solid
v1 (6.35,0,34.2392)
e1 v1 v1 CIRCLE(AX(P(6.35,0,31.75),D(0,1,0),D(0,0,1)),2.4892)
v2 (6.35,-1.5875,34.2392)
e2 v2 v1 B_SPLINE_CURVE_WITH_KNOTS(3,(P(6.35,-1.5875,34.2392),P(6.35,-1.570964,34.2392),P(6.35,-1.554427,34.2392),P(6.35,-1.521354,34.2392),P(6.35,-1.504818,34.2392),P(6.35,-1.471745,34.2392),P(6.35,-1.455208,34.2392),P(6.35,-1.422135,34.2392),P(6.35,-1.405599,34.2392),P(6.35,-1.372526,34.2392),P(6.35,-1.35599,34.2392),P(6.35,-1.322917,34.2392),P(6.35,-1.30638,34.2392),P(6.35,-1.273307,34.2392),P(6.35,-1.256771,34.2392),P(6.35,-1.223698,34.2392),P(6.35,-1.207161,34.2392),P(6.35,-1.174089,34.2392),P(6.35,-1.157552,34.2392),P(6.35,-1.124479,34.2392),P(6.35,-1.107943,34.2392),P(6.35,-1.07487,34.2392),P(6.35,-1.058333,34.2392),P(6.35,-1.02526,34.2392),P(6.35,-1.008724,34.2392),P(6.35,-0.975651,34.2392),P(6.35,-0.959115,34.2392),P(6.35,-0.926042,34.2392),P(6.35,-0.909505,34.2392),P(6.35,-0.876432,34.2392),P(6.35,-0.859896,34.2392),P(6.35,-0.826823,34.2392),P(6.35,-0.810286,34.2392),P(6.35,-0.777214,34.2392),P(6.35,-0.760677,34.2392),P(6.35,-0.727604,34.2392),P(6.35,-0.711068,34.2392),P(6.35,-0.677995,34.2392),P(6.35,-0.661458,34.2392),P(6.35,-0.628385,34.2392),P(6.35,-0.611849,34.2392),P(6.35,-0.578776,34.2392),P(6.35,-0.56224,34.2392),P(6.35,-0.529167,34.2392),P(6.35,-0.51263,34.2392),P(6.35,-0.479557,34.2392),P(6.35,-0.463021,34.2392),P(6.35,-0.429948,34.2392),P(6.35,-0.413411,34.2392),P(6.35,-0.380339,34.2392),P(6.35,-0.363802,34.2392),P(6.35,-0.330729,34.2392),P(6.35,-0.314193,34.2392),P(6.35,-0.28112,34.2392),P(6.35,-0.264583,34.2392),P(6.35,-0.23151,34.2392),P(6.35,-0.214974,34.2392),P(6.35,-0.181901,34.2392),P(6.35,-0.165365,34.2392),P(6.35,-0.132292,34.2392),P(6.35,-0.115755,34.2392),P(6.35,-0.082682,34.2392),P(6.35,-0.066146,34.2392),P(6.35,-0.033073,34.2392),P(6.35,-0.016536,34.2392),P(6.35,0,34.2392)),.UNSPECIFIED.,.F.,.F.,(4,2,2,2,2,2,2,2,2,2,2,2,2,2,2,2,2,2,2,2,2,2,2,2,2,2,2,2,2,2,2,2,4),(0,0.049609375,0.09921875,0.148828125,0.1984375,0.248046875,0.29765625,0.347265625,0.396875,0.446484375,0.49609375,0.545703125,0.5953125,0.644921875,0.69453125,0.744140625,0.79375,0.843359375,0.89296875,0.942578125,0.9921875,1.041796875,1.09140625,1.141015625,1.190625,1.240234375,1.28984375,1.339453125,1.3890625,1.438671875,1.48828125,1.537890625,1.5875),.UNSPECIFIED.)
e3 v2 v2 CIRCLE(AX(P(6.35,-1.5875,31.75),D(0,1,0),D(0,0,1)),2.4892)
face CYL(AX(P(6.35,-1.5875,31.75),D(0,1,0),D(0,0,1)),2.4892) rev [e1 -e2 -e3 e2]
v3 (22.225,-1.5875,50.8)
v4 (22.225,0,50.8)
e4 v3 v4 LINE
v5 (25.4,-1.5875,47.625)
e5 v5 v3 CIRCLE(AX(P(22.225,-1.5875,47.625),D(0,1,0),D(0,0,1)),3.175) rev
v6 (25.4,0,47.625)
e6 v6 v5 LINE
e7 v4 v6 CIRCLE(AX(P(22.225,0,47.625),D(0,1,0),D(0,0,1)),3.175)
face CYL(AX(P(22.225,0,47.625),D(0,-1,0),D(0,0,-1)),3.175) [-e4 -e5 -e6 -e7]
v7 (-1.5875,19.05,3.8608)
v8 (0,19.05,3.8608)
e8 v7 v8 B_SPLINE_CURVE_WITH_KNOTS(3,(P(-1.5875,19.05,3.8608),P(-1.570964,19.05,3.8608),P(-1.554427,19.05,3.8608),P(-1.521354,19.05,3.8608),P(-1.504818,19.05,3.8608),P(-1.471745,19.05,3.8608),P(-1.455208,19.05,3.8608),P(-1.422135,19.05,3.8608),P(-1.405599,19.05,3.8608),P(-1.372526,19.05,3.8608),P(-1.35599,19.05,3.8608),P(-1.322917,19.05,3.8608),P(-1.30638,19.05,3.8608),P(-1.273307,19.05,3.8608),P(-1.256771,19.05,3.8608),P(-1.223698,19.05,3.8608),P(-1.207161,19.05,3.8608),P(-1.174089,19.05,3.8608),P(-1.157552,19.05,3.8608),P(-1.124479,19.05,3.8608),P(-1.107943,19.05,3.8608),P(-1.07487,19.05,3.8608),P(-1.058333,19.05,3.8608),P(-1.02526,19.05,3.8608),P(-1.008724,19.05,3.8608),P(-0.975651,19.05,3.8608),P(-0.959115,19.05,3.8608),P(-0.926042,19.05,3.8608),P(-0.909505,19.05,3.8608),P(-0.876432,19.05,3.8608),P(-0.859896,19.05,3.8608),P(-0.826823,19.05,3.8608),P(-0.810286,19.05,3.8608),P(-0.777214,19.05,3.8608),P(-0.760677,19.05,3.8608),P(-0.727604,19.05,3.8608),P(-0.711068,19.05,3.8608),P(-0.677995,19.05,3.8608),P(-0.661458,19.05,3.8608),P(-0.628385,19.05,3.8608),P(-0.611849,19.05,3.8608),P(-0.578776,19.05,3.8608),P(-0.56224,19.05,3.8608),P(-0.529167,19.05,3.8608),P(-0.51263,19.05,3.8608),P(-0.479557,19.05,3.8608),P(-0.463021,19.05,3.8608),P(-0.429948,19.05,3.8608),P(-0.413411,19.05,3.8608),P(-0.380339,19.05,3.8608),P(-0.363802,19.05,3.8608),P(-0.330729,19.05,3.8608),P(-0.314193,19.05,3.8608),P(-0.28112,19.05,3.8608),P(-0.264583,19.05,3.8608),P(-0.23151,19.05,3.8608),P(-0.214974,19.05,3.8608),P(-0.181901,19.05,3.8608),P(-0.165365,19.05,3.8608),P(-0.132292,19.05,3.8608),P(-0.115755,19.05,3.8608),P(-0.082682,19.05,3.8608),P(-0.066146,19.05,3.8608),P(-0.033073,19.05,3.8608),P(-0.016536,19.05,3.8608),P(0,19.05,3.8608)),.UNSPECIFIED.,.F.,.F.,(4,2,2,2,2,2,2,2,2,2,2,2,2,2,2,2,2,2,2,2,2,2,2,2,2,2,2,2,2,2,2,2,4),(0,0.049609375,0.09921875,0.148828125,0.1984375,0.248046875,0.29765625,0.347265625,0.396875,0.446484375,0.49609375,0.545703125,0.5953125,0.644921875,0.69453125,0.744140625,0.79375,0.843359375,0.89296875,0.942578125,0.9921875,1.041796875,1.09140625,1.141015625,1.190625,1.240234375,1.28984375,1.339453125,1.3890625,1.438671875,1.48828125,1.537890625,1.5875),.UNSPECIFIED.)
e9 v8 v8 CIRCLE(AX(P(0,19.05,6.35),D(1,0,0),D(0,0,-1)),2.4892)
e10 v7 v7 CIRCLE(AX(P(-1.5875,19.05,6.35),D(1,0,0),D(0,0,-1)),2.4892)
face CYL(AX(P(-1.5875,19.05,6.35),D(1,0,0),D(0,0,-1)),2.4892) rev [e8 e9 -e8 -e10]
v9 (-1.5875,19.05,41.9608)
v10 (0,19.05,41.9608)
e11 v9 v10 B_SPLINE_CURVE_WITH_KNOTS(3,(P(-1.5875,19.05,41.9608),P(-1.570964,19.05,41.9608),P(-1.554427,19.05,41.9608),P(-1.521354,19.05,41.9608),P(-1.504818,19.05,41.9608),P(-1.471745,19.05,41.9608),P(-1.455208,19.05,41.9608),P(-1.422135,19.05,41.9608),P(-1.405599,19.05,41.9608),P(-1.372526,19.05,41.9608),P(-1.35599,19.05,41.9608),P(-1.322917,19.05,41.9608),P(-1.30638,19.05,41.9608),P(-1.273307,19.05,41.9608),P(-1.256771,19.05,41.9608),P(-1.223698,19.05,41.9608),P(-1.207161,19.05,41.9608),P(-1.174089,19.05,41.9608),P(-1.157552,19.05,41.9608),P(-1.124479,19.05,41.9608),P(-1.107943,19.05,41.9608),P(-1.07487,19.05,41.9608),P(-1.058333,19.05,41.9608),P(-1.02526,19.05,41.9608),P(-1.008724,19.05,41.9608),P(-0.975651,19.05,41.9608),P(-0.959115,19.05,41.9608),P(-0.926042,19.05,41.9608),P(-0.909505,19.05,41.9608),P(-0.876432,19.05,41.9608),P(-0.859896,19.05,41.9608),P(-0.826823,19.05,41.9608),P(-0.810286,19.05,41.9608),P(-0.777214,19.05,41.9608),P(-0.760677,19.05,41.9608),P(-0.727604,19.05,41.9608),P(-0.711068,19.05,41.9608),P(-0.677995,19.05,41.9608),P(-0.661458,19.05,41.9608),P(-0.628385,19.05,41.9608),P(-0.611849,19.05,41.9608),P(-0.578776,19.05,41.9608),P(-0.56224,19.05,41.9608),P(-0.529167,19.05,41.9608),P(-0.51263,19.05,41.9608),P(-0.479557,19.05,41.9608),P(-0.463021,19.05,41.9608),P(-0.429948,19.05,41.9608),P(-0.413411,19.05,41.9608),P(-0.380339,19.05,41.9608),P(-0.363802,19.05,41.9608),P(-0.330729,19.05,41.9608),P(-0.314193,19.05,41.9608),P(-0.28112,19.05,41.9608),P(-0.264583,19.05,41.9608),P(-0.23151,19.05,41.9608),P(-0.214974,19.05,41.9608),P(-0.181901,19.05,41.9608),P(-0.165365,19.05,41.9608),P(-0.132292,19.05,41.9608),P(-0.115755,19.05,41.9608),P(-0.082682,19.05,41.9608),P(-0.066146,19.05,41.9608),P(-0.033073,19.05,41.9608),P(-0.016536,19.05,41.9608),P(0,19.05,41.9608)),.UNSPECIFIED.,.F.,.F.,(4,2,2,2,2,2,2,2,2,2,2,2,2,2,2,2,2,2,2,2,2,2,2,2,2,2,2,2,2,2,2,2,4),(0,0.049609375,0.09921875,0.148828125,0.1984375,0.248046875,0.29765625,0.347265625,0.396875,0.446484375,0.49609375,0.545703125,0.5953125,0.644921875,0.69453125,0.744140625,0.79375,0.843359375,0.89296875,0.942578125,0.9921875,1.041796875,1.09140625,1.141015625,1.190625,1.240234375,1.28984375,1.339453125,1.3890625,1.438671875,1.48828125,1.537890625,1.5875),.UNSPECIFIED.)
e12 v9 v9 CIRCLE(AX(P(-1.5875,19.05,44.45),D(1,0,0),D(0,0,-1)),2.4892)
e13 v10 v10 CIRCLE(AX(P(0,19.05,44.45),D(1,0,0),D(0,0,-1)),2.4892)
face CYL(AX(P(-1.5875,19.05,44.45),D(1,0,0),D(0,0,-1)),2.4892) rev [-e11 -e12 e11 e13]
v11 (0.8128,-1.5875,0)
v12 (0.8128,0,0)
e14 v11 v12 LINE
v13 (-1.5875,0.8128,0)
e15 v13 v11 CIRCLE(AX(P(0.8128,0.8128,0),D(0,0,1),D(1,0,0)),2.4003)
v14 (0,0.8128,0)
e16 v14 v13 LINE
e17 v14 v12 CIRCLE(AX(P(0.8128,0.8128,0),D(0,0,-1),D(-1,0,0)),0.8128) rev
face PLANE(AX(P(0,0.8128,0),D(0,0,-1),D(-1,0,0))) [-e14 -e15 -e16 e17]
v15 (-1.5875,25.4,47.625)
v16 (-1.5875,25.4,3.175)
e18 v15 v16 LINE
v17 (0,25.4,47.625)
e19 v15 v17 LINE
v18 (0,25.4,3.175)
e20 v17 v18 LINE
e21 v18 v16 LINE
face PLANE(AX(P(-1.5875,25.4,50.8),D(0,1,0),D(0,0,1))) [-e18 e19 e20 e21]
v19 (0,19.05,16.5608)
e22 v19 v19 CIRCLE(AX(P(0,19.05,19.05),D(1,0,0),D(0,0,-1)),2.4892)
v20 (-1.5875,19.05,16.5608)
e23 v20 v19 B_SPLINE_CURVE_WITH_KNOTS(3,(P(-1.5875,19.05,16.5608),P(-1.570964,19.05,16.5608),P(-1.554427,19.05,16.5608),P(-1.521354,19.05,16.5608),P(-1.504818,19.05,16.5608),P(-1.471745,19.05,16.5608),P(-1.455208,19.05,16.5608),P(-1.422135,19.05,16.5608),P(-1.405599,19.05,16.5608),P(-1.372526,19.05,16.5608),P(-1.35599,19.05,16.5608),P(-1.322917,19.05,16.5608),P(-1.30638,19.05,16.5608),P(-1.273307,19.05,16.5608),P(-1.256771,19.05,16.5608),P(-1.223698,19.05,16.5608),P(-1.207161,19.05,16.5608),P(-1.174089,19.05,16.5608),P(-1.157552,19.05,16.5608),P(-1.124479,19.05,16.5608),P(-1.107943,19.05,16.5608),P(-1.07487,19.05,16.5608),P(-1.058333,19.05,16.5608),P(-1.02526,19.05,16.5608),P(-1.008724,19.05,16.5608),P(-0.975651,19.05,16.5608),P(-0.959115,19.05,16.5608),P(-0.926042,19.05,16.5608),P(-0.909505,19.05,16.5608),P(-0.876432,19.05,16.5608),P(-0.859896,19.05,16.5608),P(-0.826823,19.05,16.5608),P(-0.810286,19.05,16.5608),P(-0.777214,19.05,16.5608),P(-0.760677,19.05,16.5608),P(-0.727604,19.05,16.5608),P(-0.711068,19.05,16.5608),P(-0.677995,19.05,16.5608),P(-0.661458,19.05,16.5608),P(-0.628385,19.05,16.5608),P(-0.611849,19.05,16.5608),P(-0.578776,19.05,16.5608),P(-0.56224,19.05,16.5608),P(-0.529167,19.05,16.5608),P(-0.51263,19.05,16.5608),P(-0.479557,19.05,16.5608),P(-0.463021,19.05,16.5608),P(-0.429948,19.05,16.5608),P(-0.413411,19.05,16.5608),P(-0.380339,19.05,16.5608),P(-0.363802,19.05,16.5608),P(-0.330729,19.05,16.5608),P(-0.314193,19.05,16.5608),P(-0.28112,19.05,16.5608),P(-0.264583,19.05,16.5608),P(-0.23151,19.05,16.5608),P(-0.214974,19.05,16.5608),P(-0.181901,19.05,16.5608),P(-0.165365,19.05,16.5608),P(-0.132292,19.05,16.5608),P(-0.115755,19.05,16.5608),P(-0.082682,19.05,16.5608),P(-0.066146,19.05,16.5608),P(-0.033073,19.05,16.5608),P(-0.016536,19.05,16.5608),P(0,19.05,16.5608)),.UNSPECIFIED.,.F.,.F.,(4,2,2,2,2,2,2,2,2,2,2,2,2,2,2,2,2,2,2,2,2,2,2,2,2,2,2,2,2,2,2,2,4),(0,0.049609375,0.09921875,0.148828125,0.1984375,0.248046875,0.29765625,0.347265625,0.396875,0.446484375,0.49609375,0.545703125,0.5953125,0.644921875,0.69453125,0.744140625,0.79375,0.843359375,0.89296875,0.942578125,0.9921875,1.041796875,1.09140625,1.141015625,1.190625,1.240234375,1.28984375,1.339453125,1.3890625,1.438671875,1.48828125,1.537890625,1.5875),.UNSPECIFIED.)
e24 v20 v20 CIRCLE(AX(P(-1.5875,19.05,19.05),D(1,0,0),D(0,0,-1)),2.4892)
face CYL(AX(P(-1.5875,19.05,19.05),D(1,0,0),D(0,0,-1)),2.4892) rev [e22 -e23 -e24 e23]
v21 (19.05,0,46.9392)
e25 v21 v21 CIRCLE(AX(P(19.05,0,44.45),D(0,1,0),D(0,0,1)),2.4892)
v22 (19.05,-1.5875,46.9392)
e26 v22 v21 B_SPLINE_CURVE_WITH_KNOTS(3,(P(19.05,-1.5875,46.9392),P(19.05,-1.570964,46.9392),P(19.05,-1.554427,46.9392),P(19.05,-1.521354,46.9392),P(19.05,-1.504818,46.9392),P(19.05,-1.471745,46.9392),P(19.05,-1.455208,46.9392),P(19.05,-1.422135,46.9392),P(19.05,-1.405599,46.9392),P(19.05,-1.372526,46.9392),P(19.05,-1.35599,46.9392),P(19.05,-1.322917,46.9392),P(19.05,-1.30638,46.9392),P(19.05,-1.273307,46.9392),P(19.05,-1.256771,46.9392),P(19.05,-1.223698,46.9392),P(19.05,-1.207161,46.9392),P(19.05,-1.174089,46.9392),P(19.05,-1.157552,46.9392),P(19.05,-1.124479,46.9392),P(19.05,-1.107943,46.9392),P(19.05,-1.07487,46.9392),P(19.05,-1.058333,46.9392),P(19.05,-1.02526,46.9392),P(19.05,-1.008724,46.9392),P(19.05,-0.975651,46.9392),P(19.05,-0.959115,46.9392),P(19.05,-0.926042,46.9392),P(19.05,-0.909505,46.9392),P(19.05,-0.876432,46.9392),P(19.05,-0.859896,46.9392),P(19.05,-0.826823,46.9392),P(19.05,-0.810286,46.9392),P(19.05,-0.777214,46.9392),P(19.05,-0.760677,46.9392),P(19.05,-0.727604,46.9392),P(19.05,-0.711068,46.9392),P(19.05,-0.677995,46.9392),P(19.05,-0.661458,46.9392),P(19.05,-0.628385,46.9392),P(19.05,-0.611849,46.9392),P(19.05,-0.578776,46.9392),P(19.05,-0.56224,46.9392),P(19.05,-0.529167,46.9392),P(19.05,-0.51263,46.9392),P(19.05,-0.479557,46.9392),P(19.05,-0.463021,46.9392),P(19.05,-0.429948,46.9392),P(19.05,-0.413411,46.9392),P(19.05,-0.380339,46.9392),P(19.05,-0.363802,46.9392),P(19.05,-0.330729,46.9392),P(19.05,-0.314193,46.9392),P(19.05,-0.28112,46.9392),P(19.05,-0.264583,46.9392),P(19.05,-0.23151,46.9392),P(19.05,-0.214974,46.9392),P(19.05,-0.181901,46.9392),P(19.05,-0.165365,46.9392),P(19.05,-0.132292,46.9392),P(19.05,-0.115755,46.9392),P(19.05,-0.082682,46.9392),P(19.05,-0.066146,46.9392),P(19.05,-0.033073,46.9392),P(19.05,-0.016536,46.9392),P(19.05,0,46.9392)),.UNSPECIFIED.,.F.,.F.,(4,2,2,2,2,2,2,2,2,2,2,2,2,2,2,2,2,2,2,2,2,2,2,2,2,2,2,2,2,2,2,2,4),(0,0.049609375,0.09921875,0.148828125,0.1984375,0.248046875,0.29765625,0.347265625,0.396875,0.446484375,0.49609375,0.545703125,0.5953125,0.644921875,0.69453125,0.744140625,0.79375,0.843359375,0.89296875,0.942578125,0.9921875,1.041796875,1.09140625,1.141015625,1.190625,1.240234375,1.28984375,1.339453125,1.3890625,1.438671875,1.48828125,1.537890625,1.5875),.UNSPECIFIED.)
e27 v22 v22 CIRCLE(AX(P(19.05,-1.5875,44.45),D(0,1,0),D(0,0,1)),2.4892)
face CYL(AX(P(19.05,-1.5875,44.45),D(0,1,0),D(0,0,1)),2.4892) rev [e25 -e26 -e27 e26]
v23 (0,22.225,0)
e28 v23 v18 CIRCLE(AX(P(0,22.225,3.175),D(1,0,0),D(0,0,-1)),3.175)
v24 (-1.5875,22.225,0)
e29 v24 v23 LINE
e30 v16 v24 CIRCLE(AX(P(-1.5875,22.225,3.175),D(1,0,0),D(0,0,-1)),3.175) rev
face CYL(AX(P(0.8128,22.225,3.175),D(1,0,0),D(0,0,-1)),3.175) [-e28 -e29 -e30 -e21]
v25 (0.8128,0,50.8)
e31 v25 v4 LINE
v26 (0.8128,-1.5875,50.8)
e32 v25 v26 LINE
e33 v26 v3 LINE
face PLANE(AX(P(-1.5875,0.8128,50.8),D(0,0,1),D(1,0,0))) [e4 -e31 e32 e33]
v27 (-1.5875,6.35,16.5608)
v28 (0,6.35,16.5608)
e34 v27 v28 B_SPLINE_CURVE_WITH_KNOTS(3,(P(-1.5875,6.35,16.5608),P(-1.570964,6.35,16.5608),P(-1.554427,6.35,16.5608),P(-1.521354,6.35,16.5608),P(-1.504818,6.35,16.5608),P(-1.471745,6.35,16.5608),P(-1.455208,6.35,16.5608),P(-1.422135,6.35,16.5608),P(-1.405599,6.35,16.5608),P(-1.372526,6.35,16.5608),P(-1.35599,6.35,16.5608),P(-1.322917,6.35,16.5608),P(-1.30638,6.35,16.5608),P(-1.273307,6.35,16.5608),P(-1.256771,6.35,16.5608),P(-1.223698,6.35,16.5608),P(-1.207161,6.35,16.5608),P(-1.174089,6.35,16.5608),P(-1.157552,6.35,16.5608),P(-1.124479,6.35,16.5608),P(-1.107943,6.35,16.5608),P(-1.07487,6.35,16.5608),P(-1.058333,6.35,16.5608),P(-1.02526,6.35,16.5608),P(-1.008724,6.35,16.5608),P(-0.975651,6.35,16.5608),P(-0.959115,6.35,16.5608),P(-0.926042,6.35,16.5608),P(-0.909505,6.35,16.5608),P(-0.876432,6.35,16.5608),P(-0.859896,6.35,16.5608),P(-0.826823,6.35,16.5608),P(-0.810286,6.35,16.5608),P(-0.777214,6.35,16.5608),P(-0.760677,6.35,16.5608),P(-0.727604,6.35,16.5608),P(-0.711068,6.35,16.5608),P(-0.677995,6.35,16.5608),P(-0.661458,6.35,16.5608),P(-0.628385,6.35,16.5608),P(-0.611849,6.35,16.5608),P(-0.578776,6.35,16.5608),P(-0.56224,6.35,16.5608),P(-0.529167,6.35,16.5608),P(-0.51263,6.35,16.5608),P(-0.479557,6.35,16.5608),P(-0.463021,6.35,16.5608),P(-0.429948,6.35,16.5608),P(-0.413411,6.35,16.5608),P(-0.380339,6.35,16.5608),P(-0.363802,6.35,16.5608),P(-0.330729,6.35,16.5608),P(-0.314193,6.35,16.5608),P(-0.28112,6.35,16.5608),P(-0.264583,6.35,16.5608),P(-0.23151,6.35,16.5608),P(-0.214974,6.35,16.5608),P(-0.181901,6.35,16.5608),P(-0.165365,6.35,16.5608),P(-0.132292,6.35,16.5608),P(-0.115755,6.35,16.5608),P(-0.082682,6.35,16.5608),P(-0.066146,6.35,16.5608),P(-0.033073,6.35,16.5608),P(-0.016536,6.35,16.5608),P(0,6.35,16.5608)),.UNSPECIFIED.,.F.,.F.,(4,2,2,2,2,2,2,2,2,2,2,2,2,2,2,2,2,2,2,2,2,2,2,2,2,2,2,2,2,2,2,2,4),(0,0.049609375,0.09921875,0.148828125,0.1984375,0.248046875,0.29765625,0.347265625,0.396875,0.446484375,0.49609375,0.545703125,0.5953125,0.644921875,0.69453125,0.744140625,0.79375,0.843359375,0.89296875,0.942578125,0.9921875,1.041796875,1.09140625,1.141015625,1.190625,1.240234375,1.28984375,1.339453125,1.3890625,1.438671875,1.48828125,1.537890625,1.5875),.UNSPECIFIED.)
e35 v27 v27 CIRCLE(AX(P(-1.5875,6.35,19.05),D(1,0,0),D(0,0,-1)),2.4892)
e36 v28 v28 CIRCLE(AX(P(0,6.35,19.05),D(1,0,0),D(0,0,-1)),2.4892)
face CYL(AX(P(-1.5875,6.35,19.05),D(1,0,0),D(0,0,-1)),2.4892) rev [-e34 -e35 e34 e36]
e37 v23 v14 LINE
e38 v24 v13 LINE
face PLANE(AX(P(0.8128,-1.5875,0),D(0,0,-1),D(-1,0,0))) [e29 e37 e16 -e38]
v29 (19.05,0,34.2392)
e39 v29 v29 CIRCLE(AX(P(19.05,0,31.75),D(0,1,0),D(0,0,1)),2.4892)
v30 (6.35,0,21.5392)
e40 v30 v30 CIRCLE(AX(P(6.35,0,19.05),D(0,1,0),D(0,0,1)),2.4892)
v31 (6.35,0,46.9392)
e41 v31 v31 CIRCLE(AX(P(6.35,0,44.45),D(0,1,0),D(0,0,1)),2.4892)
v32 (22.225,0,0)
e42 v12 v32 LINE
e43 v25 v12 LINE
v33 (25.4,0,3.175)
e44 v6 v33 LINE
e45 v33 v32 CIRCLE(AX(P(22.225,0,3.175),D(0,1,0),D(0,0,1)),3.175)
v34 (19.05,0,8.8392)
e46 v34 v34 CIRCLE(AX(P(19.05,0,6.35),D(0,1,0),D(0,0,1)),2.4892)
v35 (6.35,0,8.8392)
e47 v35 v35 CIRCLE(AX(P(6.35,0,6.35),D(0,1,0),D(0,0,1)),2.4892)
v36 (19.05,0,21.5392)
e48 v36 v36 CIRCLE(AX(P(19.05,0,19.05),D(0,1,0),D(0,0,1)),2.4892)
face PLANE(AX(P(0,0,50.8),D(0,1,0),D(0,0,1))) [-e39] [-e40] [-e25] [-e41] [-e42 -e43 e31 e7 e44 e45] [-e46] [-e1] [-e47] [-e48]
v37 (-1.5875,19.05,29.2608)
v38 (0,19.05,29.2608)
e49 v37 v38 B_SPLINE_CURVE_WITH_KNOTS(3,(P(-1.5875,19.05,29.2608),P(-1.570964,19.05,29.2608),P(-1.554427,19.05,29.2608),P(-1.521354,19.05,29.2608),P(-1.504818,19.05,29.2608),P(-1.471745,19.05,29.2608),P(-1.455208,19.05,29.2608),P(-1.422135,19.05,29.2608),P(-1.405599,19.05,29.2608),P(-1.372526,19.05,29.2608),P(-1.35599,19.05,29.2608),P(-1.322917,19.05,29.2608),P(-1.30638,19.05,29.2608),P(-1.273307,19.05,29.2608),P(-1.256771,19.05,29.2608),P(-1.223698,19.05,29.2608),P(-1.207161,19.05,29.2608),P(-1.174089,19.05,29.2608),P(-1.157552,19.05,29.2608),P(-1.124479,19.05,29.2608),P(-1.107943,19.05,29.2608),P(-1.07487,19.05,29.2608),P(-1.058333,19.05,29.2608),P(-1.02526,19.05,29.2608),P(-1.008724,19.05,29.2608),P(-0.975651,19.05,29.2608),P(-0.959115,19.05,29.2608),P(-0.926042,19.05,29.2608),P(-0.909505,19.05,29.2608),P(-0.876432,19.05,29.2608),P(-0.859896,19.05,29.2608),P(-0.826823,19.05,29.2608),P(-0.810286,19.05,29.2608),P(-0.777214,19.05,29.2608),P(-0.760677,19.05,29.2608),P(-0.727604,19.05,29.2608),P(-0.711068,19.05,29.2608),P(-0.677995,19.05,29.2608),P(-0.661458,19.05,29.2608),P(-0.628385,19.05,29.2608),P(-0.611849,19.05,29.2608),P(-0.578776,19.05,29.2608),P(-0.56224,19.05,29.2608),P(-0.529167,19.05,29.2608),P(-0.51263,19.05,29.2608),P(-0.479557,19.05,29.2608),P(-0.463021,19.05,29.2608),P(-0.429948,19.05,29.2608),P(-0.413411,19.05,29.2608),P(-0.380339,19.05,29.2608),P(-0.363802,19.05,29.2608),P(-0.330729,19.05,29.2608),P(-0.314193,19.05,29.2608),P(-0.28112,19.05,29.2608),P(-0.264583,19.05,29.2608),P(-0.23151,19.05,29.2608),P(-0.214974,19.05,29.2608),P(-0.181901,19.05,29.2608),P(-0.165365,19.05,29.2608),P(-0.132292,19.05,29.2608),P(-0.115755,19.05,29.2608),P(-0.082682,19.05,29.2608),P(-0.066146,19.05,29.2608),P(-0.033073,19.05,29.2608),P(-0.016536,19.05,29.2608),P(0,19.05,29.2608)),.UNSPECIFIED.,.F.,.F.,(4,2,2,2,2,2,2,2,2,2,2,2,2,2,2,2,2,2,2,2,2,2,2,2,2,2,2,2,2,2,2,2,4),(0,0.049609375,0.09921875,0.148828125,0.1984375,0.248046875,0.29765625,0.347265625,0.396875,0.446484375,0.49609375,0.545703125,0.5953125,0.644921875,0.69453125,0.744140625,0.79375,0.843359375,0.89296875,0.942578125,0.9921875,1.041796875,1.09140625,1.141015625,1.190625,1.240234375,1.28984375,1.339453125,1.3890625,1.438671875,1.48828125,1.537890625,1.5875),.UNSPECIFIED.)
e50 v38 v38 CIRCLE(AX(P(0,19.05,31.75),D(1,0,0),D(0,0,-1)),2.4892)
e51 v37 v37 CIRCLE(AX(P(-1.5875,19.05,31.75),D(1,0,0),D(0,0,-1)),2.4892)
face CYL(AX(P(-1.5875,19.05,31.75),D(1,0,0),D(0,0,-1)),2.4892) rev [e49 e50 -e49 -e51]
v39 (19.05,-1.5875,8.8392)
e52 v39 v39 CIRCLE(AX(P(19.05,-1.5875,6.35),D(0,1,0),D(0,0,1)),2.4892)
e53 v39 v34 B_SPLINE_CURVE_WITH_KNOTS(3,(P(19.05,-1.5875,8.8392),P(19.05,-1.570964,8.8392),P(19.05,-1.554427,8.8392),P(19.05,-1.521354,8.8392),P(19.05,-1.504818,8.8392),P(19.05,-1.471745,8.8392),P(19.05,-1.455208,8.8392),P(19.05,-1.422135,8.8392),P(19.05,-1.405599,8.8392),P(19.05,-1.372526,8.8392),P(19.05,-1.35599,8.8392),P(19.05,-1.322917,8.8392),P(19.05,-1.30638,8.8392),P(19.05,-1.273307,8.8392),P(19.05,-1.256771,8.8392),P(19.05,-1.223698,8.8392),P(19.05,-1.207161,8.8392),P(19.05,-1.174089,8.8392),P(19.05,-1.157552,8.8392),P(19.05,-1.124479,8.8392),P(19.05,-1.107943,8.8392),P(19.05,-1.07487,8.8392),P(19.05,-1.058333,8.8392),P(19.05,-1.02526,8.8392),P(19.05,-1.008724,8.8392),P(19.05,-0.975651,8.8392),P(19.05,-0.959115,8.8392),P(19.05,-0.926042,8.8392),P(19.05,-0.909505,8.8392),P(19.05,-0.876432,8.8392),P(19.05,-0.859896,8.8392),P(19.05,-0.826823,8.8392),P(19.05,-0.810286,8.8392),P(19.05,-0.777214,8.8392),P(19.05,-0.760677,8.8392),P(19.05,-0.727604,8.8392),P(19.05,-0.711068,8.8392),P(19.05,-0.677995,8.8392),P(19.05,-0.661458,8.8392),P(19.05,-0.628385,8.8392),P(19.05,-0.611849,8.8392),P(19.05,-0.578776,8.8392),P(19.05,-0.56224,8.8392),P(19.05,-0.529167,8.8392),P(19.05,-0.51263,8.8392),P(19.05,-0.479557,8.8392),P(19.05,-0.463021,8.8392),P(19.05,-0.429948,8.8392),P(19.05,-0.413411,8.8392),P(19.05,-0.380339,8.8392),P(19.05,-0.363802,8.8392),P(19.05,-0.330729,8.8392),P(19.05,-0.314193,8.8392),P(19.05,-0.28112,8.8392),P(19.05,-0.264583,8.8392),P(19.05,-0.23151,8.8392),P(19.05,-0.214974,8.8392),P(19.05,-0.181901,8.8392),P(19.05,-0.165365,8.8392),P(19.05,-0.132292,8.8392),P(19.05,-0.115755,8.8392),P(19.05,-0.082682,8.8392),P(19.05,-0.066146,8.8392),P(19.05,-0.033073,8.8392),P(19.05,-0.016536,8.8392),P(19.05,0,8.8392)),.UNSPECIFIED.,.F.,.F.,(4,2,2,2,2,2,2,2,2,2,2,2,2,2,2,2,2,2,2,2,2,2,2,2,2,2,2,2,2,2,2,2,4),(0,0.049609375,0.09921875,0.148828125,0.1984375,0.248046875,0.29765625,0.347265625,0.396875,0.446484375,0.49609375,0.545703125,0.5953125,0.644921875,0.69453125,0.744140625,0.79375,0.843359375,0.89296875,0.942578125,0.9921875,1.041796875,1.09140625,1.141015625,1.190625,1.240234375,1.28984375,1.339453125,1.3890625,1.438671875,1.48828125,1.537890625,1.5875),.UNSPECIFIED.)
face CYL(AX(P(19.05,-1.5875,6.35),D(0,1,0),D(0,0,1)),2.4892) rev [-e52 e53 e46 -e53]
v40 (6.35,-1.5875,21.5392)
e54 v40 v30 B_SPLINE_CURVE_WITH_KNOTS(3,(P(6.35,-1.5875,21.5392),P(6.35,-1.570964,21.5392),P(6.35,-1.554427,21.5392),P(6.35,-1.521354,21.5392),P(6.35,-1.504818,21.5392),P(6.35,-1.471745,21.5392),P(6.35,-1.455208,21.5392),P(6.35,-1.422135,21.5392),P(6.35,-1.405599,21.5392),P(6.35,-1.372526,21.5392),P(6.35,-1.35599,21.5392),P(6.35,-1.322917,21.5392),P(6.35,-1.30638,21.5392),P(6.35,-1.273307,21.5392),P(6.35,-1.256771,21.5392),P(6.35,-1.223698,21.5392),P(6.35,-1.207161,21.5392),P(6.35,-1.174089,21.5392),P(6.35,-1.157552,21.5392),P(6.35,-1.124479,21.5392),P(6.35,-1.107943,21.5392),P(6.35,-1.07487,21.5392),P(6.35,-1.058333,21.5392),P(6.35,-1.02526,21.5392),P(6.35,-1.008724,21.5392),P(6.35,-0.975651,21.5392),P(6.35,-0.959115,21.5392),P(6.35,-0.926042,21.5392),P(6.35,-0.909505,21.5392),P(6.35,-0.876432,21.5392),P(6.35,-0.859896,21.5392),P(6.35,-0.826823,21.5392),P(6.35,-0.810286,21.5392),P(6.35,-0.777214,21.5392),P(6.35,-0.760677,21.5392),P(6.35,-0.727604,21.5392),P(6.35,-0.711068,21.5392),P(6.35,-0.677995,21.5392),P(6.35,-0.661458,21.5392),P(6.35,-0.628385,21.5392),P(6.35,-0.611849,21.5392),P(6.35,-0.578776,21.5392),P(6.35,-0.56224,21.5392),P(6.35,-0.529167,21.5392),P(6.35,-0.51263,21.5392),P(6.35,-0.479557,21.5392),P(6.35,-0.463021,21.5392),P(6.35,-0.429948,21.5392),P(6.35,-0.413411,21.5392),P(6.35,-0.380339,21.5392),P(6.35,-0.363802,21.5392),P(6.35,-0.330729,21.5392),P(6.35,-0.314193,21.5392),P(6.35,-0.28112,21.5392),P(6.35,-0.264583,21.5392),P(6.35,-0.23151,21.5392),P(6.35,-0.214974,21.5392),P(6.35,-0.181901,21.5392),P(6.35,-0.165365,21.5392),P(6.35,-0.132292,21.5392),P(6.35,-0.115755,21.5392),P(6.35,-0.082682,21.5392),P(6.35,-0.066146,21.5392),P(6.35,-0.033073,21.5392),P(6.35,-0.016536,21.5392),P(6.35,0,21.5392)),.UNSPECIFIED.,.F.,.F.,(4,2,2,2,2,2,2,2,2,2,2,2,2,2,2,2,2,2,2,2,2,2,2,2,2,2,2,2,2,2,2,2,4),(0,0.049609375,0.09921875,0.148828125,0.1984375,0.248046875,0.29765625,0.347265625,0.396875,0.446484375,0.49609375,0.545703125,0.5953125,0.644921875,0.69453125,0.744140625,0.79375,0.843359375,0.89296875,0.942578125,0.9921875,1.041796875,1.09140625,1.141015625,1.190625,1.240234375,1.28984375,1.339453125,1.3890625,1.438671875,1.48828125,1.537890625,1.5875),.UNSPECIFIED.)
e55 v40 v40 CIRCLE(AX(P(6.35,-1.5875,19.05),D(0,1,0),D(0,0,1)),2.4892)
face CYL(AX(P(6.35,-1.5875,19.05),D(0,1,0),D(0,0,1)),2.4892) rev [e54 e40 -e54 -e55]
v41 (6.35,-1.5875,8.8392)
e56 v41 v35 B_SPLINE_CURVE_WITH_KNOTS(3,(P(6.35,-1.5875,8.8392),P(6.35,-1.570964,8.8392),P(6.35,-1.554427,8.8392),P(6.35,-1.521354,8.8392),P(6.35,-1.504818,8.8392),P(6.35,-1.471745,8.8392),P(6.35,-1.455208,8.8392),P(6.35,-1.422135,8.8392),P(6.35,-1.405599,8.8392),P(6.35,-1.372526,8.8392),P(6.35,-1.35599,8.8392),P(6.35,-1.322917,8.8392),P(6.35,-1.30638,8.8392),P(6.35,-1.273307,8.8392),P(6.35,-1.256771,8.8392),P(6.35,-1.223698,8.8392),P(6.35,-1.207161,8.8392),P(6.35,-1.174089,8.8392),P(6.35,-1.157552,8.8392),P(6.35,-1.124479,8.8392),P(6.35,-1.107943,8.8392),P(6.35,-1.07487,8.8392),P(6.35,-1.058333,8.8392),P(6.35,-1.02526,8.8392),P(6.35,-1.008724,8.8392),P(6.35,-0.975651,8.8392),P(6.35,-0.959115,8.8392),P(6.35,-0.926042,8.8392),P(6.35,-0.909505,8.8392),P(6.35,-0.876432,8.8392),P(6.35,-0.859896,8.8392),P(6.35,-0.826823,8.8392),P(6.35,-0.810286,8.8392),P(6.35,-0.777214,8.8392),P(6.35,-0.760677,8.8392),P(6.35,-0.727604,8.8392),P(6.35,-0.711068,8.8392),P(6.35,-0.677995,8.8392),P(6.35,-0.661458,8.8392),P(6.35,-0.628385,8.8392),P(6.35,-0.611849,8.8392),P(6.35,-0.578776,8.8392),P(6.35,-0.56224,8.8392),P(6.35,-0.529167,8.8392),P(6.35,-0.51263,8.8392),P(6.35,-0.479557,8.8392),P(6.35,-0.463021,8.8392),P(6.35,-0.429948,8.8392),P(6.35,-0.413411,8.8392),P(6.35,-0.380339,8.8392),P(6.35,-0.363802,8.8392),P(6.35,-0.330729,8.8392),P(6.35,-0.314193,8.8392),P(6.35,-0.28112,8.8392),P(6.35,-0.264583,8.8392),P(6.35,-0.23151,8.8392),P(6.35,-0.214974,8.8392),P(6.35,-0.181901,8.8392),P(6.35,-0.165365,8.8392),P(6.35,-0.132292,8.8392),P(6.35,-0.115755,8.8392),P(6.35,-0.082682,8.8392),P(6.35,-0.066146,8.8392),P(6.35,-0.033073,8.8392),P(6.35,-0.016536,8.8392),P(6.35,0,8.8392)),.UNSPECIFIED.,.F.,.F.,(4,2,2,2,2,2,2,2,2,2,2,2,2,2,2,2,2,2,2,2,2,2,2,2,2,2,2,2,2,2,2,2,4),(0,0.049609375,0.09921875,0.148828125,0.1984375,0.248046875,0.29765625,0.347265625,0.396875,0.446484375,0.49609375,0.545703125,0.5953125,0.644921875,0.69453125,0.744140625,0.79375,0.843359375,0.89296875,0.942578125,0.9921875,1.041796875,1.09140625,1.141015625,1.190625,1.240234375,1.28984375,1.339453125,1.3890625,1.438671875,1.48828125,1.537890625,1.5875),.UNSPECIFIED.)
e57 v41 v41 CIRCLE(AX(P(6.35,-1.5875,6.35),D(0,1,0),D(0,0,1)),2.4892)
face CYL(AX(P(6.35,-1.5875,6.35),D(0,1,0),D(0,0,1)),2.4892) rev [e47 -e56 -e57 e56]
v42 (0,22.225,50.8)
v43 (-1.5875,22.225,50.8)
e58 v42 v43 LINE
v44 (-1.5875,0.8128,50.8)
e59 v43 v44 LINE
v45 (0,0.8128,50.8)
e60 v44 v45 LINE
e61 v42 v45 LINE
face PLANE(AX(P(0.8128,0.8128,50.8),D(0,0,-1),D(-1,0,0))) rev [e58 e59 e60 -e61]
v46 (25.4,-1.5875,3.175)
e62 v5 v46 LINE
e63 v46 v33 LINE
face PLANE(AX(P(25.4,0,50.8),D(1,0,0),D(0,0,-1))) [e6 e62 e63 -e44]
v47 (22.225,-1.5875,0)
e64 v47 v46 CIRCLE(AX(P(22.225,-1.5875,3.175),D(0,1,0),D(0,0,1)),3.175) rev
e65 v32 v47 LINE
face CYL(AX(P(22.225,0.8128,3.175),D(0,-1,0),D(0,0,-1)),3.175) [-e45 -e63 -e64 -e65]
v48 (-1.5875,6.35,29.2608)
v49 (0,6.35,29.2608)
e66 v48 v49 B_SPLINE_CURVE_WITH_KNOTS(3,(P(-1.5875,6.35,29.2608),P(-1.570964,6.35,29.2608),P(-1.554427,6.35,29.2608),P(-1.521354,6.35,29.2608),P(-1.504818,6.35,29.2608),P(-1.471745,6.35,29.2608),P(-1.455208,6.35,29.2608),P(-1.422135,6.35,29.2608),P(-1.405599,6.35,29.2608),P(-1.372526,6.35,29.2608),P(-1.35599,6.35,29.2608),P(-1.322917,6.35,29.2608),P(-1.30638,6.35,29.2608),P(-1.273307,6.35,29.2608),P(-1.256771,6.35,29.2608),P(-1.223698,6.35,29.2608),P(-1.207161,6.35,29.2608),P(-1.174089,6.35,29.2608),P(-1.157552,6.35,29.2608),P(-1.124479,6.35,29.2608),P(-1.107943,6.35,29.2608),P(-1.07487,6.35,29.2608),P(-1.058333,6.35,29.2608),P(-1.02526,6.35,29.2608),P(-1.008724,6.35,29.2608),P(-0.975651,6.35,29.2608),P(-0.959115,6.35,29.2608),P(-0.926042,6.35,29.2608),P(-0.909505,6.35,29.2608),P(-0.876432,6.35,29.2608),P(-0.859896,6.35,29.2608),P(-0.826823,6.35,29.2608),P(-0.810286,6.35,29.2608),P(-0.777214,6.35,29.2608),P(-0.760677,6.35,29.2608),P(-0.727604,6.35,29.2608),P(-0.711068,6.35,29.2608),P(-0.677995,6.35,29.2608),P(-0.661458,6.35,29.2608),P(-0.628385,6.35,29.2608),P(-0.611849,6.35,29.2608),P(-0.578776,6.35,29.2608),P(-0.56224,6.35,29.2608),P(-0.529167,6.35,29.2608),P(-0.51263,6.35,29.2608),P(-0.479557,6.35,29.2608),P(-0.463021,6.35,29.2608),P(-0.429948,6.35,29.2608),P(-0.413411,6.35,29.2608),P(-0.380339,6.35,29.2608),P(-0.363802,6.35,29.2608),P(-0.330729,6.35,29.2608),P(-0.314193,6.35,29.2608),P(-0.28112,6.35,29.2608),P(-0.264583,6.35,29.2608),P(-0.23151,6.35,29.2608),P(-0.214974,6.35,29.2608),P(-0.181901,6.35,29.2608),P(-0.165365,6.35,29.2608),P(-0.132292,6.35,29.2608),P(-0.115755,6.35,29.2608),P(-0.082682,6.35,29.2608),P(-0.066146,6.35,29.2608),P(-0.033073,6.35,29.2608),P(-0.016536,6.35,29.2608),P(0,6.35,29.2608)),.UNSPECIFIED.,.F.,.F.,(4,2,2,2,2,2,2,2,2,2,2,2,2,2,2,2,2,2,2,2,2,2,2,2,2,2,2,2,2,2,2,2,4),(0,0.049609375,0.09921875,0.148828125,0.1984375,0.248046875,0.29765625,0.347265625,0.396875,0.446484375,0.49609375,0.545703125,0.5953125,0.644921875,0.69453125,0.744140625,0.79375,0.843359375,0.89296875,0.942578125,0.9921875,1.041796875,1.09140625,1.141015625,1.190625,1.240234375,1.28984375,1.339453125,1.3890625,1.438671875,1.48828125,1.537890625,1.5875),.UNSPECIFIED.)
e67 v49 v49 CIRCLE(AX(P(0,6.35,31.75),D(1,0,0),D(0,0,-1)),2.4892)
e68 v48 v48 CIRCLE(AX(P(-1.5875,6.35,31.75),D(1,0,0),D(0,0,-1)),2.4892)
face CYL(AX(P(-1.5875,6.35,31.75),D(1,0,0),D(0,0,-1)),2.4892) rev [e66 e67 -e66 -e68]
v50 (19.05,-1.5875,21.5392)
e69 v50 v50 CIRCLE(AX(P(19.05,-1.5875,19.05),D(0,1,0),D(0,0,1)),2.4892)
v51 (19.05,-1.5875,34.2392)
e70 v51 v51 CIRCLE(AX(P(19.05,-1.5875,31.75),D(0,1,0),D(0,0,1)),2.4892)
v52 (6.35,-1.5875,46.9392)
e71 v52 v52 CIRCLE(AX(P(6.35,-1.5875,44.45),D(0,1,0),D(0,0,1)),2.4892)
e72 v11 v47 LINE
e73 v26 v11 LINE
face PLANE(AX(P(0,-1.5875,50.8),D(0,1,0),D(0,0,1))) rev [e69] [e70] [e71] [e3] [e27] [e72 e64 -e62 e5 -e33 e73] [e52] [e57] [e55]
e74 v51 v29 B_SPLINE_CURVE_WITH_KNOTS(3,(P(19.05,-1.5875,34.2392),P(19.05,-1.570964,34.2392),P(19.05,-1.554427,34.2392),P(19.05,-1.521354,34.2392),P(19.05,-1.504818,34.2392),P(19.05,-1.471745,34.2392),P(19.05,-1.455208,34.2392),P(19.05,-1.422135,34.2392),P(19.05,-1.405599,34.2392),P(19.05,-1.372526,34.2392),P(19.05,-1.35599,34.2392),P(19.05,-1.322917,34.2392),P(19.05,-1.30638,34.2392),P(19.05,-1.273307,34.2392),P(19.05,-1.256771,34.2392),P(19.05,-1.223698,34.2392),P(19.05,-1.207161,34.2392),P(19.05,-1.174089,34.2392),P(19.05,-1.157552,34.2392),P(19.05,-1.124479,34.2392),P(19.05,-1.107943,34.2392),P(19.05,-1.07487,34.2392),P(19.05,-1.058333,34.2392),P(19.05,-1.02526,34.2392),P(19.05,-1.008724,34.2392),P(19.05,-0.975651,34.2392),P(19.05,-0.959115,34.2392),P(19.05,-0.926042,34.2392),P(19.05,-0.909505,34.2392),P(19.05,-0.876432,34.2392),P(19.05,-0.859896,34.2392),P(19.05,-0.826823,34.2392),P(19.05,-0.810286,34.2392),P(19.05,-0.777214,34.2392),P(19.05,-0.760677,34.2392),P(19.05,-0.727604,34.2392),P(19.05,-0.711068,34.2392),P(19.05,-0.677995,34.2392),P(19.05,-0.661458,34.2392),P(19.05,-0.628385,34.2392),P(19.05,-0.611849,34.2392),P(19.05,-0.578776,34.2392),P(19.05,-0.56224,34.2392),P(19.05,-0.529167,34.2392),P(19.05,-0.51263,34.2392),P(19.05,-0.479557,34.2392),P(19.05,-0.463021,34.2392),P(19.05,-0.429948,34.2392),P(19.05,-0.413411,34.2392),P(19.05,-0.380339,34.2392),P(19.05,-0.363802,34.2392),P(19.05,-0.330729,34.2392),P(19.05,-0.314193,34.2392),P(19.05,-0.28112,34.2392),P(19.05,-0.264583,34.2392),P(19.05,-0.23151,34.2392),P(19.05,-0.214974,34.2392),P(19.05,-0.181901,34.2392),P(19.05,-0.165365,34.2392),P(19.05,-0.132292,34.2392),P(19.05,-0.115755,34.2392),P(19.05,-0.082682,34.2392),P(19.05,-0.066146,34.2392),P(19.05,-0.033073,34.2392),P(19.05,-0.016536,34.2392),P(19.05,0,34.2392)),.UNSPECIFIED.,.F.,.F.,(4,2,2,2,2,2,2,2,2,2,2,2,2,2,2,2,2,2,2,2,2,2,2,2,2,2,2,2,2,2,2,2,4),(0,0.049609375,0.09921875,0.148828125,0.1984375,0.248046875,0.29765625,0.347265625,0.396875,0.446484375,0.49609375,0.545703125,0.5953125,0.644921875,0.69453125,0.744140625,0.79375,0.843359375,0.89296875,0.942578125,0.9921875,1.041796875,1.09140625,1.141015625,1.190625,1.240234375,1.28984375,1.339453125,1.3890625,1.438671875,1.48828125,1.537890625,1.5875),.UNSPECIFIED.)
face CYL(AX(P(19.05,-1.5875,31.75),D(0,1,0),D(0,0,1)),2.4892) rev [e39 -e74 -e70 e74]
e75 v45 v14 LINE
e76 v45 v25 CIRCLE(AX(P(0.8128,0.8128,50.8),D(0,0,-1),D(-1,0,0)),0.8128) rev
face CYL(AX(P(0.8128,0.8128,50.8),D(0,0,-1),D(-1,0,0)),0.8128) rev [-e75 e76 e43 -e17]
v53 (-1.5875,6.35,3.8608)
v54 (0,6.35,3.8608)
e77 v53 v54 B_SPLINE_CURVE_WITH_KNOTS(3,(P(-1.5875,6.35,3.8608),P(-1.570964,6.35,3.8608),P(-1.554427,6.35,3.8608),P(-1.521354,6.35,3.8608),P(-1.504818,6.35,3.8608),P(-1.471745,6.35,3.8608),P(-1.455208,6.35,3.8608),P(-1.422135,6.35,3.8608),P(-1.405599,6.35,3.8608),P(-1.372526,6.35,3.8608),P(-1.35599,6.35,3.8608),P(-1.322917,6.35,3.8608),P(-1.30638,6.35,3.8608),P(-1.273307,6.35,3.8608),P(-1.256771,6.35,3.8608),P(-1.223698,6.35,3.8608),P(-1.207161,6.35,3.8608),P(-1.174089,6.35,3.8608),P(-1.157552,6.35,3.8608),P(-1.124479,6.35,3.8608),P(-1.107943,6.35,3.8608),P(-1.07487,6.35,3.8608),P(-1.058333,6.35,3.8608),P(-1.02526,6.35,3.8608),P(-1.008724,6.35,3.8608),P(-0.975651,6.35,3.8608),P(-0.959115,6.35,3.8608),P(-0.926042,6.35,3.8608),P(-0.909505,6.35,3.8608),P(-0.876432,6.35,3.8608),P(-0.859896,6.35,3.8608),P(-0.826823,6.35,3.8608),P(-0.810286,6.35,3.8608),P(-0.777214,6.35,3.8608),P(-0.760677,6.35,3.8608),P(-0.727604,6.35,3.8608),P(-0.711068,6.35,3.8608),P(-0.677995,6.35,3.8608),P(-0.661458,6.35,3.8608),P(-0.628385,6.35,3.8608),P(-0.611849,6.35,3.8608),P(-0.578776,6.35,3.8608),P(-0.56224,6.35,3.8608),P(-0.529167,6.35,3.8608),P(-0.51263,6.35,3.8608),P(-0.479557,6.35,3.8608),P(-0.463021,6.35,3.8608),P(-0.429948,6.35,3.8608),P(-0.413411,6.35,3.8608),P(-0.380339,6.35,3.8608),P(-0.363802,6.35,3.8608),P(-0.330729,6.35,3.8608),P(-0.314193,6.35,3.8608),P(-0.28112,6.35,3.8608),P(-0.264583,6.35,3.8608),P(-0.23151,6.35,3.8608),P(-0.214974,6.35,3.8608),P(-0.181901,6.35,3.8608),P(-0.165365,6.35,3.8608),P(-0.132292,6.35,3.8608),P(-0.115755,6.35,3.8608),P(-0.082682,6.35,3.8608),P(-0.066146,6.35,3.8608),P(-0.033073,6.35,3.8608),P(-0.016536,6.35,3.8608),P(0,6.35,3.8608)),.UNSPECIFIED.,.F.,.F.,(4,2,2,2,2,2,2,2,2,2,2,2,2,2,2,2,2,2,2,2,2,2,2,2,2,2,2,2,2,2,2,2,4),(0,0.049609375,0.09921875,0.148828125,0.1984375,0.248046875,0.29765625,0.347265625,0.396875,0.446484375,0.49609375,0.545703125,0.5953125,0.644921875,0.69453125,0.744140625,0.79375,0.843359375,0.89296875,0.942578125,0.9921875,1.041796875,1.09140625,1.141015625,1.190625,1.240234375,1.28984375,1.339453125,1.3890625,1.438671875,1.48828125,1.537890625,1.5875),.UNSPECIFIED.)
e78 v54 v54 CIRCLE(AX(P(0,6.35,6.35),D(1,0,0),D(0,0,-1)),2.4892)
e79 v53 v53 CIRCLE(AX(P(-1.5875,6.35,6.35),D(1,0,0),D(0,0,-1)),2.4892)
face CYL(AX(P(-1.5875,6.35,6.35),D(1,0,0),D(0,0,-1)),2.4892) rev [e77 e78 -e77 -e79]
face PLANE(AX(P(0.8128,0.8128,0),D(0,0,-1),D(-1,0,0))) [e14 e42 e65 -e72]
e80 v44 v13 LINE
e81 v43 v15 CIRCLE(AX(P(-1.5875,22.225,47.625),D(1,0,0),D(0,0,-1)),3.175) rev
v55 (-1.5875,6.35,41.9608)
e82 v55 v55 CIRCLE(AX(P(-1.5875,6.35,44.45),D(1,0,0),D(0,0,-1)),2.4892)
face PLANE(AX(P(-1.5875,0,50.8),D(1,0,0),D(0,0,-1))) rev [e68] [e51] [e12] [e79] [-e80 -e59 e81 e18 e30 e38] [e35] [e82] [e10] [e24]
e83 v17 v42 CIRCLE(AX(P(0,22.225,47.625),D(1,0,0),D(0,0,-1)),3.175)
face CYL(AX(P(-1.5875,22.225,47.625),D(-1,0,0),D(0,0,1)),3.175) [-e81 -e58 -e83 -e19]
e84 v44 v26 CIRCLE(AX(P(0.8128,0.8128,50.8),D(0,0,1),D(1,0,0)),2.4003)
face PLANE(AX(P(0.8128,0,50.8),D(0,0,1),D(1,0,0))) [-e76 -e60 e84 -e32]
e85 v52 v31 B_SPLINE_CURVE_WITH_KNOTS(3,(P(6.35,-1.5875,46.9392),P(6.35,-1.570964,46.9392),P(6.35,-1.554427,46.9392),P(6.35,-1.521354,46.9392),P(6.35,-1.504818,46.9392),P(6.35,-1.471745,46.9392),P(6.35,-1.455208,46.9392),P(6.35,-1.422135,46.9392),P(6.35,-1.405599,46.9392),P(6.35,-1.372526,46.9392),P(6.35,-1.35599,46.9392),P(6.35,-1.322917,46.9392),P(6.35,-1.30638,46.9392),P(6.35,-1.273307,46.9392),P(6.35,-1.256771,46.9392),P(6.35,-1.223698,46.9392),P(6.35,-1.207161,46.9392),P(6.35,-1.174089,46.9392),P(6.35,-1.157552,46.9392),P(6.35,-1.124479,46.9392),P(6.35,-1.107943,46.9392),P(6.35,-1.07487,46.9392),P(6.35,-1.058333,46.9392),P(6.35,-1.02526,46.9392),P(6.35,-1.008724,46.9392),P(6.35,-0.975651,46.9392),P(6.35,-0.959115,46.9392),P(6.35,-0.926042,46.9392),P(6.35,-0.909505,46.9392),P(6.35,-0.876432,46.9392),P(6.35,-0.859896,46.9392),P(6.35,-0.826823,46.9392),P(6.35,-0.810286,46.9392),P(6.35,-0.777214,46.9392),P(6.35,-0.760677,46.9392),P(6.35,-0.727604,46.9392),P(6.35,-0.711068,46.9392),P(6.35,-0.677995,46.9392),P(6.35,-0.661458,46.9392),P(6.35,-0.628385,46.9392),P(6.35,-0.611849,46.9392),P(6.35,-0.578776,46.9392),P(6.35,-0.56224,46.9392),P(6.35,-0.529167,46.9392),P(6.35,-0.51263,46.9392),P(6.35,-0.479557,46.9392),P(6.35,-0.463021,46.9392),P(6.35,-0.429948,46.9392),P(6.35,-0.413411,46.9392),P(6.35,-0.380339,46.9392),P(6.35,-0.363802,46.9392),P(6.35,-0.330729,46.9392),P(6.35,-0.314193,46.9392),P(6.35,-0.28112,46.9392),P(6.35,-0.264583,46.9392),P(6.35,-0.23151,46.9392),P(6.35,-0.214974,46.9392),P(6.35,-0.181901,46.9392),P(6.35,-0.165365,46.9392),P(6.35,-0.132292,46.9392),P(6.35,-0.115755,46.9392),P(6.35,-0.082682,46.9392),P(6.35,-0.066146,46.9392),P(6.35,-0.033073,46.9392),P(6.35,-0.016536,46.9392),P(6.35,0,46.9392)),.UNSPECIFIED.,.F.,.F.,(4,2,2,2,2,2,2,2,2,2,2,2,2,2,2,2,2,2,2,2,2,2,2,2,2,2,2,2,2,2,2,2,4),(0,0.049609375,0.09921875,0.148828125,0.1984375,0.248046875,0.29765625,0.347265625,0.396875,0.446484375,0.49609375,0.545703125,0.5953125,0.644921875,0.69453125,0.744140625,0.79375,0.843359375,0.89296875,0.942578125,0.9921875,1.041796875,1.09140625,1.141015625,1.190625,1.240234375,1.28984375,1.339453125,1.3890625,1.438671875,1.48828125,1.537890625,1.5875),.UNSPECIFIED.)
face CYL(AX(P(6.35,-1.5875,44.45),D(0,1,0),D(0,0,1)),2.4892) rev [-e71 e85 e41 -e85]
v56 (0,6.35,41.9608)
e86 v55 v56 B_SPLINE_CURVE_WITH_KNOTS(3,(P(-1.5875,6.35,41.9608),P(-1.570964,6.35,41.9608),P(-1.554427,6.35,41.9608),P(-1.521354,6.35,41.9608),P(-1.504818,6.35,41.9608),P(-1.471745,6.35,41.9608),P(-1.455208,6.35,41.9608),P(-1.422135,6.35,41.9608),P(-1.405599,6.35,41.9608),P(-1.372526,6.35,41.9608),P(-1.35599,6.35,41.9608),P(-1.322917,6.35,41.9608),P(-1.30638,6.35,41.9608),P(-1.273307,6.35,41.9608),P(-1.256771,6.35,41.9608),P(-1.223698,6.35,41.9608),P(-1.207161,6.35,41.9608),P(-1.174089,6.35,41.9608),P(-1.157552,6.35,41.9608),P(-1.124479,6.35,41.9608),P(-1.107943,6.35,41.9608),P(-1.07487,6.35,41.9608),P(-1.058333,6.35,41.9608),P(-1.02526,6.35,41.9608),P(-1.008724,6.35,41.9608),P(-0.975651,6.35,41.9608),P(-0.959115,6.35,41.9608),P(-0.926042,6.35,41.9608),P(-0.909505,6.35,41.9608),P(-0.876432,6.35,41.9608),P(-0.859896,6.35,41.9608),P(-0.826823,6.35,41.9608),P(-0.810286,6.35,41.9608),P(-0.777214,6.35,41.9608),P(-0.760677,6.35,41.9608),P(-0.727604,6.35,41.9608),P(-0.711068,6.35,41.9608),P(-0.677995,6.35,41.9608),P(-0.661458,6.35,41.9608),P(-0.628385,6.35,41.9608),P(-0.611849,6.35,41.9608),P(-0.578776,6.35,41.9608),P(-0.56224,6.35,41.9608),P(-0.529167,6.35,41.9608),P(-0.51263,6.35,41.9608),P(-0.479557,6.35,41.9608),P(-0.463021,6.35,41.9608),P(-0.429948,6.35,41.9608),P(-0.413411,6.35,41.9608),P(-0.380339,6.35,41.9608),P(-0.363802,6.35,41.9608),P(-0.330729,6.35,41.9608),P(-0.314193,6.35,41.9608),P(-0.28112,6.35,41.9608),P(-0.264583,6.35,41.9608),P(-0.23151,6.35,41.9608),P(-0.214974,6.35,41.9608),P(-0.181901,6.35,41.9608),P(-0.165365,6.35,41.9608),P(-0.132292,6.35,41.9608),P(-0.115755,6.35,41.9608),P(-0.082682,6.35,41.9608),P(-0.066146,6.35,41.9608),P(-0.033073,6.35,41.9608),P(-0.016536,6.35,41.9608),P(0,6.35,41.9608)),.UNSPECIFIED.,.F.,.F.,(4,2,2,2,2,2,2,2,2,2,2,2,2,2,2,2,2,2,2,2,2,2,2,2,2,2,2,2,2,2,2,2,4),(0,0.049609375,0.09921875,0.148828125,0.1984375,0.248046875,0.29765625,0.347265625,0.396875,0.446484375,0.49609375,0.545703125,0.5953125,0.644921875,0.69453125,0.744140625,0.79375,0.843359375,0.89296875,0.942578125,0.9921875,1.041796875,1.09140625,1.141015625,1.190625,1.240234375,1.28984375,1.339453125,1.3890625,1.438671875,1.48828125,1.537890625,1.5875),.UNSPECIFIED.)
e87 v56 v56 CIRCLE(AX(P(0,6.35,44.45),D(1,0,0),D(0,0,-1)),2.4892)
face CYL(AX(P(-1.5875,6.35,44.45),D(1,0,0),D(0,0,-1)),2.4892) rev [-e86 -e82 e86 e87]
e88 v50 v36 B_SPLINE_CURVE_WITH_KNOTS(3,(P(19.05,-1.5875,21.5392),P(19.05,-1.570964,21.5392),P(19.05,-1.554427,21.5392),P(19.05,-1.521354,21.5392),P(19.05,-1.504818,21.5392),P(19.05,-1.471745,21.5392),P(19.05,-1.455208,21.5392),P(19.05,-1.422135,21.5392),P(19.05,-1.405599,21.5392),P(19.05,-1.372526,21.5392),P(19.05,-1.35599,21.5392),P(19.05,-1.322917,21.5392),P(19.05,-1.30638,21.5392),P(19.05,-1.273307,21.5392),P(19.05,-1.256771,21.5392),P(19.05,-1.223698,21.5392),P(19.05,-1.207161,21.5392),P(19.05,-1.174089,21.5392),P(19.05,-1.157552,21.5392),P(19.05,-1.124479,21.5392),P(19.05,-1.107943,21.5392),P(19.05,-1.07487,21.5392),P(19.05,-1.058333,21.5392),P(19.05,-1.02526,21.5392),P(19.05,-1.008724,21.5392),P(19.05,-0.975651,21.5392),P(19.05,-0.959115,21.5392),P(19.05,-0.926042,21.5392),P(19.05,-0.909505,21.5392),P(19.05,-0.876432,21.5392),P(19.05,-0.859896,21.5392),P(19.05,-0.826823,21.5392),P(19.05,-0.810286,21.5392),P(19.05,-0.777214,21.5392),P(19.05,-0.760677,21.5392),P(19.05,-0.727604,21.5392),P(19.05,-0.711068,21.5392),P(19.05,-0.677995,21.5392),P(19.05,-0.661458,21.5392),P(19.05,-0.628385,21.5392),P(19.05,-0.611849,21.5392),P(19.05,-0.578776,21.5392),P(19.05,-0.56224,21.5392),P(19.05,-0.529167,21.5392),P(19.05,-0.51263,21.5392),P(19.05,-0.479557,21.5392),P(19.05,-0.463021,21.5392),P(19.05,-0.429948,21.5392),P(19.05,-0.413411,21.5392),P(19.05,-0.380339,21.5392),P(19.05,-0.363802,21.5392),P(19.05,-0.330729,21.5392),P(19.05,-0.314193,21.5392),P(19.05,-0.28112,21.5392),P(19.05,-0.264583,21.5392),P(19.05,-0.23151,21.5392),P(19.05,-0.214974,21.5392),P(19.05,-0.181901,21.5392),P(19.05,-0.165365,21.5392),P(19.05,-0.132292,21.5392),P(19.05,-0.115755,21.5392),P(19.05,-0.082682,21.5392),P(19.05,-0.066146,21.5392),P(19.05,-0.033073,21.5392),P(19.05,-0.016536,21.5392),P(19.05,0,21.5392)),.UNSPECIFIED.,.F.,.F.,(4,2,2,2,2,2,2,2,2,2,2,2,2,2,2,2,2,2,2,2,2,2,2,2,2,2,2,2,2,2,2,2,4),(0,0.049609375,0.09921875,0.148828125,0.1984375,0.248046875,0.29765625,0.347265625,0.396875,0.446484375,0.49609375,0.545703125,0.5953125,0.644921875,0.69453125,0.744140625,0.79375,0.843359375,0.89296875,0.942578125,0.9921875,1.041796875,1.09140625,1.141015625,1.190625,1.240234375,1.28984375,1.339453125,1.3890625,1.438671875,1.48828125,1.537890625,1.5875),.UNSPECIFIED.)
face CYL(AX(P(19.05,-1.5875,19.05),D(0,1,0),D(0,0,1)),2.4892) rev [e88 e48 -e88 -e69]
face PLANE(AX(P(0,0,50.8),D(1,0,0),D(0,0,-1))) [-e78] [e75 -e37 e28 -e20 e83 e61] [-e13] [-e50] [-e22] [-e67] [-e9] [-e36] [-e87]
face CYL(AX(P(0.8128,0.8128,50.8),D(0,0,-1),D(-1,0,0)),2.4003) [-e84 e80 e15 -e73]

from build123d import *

# Parameters (mm, degrees)
BASE_FLANGE1_DEPTH = 50.8
SKETCH6_R          = 2.4892
CUT_EXTRUDE1_DEPTH = 63.217039467
SKETCH7_R          = 2.4892
CUT_EXTRUDE2_DEPTH = 63.217039467
FILLET1_R          = 3.175


# Read off the part's stored shape, not the designer's step: Base-Flange1
with BuildPart() as part:
    # Base-Flange1 outline → Base-Flange1 (new body)
    with BuildSketch(Plane.XY):
        with BuildLine():
            Line((0.8128, -1.5875), (25.4, -1.5875))
            Line((25.4, -1.5875), (25.4, 0))
            Line((25.4, 0), (0.8128, 0))
            ThreePointArc((0.8128, 0), (0.238063608, 0.238063608), (0, 0.8128))
            Line((0, 0.8128), (0, 25.4))
            Line((0, 25.4), (-1.5875, 25.4))
            Line((-1.5875, 25.4), (-1.5875, 0.8128))
            ThreePointArc((-1.5875, 0.8128), (-0.884468407, -0.884468407), (0.8128, -1.5875))
        make_face()
    extrude(amount=BASE_FLANGE1_DEPTH)

    # Sketch6 → Cut-Extrude1 (cut, through all)
    with BuildSketch(Plane(origin=(0, 0, 0), x_dir=(0, 0, -1), z_dir=(1, 0, 0))):
        with Locations((-44.45, 19.05)):
            Circle(SKETCH6_R)
        with Locations((-31.75, 19.05)):
            Circle(SKETCH6_R)
        with Locations((-19.05, 19.05)):
            Circle(SKETCH6_R)
        with Locations((-6.35, 19.05)):
            Circle(SKETCH6_R)
        with Locations((-6.35, 6.35)):
            Circle(SKETCH6_R)
        with Locations((-19.05, 6.35)):
            Circle(SKETCH6_R)
        with Locations((-31.75, 6.35)):
            Circle(SKETCH6_R)
        with Locations((-44.45, 6.35)):
            Circle(SKETCH6_R)
    extrude(amount=-CUT_EXTRUDE1_DEPTH, mode=Mode.SUBTRACT)

    # Sketch7 → Cut-Extrude2 (cut, through all)
    with BuildSketch(Plane(origin=(0, 0, 0), x_dir=(1, 0, 0), z_dir=(0, 1, 0))):
        with Locations(Location((19.05, -6.35, 0), (0, 0, 270))):
            Circle(SKETCH7_R)
        with Locations(Location((19.05, -19.05, 0), (0, 0, 270))):
            Circle(SKETCH7_R)
        with Locations(Location((6.35, -19.05, 0), (0, 0, 270))):
            Circle(SKETCH7_R)
        with Locations(Location((6.35, -6.35, 0), (0, 0, 270))):
            Circle(SKETCH7_R)
        with Locations(Location((19.05, -31.75, 0), (0, 0, 270))):
            Circle(SKETCH7_R)
        with Locations(Location((19.05, -44.45, 0), (0, 0, 270))):
            Circle(SKETCH7_R)
        with Locations(Location((6.35, -31.75, 0), (0, 0, 270))):
            Circle(SKETCH7_R)
        with Locations(Location((6.35, -44.45, 0), (0, 0, 270))):
            Circle(SKETCH7_R)
    extrude(amount=-CUT_EXTRUDE2_DEPTH, mode=Mode.SUBTRACT)

    # Fillet1
    fillet1_edges = [part.edges().sort_by_distance(p)[0] for p in [
        (-0.79375, 25.4, 50.8),
        (-0.79375, 25.4, 0),
        (25.4, -0.79375, 50.8),
        (25.4, -0.79375, 0),
    ]]
    fillet(fillet1_edges, radius=FILLET1_R)


solid = part.part
